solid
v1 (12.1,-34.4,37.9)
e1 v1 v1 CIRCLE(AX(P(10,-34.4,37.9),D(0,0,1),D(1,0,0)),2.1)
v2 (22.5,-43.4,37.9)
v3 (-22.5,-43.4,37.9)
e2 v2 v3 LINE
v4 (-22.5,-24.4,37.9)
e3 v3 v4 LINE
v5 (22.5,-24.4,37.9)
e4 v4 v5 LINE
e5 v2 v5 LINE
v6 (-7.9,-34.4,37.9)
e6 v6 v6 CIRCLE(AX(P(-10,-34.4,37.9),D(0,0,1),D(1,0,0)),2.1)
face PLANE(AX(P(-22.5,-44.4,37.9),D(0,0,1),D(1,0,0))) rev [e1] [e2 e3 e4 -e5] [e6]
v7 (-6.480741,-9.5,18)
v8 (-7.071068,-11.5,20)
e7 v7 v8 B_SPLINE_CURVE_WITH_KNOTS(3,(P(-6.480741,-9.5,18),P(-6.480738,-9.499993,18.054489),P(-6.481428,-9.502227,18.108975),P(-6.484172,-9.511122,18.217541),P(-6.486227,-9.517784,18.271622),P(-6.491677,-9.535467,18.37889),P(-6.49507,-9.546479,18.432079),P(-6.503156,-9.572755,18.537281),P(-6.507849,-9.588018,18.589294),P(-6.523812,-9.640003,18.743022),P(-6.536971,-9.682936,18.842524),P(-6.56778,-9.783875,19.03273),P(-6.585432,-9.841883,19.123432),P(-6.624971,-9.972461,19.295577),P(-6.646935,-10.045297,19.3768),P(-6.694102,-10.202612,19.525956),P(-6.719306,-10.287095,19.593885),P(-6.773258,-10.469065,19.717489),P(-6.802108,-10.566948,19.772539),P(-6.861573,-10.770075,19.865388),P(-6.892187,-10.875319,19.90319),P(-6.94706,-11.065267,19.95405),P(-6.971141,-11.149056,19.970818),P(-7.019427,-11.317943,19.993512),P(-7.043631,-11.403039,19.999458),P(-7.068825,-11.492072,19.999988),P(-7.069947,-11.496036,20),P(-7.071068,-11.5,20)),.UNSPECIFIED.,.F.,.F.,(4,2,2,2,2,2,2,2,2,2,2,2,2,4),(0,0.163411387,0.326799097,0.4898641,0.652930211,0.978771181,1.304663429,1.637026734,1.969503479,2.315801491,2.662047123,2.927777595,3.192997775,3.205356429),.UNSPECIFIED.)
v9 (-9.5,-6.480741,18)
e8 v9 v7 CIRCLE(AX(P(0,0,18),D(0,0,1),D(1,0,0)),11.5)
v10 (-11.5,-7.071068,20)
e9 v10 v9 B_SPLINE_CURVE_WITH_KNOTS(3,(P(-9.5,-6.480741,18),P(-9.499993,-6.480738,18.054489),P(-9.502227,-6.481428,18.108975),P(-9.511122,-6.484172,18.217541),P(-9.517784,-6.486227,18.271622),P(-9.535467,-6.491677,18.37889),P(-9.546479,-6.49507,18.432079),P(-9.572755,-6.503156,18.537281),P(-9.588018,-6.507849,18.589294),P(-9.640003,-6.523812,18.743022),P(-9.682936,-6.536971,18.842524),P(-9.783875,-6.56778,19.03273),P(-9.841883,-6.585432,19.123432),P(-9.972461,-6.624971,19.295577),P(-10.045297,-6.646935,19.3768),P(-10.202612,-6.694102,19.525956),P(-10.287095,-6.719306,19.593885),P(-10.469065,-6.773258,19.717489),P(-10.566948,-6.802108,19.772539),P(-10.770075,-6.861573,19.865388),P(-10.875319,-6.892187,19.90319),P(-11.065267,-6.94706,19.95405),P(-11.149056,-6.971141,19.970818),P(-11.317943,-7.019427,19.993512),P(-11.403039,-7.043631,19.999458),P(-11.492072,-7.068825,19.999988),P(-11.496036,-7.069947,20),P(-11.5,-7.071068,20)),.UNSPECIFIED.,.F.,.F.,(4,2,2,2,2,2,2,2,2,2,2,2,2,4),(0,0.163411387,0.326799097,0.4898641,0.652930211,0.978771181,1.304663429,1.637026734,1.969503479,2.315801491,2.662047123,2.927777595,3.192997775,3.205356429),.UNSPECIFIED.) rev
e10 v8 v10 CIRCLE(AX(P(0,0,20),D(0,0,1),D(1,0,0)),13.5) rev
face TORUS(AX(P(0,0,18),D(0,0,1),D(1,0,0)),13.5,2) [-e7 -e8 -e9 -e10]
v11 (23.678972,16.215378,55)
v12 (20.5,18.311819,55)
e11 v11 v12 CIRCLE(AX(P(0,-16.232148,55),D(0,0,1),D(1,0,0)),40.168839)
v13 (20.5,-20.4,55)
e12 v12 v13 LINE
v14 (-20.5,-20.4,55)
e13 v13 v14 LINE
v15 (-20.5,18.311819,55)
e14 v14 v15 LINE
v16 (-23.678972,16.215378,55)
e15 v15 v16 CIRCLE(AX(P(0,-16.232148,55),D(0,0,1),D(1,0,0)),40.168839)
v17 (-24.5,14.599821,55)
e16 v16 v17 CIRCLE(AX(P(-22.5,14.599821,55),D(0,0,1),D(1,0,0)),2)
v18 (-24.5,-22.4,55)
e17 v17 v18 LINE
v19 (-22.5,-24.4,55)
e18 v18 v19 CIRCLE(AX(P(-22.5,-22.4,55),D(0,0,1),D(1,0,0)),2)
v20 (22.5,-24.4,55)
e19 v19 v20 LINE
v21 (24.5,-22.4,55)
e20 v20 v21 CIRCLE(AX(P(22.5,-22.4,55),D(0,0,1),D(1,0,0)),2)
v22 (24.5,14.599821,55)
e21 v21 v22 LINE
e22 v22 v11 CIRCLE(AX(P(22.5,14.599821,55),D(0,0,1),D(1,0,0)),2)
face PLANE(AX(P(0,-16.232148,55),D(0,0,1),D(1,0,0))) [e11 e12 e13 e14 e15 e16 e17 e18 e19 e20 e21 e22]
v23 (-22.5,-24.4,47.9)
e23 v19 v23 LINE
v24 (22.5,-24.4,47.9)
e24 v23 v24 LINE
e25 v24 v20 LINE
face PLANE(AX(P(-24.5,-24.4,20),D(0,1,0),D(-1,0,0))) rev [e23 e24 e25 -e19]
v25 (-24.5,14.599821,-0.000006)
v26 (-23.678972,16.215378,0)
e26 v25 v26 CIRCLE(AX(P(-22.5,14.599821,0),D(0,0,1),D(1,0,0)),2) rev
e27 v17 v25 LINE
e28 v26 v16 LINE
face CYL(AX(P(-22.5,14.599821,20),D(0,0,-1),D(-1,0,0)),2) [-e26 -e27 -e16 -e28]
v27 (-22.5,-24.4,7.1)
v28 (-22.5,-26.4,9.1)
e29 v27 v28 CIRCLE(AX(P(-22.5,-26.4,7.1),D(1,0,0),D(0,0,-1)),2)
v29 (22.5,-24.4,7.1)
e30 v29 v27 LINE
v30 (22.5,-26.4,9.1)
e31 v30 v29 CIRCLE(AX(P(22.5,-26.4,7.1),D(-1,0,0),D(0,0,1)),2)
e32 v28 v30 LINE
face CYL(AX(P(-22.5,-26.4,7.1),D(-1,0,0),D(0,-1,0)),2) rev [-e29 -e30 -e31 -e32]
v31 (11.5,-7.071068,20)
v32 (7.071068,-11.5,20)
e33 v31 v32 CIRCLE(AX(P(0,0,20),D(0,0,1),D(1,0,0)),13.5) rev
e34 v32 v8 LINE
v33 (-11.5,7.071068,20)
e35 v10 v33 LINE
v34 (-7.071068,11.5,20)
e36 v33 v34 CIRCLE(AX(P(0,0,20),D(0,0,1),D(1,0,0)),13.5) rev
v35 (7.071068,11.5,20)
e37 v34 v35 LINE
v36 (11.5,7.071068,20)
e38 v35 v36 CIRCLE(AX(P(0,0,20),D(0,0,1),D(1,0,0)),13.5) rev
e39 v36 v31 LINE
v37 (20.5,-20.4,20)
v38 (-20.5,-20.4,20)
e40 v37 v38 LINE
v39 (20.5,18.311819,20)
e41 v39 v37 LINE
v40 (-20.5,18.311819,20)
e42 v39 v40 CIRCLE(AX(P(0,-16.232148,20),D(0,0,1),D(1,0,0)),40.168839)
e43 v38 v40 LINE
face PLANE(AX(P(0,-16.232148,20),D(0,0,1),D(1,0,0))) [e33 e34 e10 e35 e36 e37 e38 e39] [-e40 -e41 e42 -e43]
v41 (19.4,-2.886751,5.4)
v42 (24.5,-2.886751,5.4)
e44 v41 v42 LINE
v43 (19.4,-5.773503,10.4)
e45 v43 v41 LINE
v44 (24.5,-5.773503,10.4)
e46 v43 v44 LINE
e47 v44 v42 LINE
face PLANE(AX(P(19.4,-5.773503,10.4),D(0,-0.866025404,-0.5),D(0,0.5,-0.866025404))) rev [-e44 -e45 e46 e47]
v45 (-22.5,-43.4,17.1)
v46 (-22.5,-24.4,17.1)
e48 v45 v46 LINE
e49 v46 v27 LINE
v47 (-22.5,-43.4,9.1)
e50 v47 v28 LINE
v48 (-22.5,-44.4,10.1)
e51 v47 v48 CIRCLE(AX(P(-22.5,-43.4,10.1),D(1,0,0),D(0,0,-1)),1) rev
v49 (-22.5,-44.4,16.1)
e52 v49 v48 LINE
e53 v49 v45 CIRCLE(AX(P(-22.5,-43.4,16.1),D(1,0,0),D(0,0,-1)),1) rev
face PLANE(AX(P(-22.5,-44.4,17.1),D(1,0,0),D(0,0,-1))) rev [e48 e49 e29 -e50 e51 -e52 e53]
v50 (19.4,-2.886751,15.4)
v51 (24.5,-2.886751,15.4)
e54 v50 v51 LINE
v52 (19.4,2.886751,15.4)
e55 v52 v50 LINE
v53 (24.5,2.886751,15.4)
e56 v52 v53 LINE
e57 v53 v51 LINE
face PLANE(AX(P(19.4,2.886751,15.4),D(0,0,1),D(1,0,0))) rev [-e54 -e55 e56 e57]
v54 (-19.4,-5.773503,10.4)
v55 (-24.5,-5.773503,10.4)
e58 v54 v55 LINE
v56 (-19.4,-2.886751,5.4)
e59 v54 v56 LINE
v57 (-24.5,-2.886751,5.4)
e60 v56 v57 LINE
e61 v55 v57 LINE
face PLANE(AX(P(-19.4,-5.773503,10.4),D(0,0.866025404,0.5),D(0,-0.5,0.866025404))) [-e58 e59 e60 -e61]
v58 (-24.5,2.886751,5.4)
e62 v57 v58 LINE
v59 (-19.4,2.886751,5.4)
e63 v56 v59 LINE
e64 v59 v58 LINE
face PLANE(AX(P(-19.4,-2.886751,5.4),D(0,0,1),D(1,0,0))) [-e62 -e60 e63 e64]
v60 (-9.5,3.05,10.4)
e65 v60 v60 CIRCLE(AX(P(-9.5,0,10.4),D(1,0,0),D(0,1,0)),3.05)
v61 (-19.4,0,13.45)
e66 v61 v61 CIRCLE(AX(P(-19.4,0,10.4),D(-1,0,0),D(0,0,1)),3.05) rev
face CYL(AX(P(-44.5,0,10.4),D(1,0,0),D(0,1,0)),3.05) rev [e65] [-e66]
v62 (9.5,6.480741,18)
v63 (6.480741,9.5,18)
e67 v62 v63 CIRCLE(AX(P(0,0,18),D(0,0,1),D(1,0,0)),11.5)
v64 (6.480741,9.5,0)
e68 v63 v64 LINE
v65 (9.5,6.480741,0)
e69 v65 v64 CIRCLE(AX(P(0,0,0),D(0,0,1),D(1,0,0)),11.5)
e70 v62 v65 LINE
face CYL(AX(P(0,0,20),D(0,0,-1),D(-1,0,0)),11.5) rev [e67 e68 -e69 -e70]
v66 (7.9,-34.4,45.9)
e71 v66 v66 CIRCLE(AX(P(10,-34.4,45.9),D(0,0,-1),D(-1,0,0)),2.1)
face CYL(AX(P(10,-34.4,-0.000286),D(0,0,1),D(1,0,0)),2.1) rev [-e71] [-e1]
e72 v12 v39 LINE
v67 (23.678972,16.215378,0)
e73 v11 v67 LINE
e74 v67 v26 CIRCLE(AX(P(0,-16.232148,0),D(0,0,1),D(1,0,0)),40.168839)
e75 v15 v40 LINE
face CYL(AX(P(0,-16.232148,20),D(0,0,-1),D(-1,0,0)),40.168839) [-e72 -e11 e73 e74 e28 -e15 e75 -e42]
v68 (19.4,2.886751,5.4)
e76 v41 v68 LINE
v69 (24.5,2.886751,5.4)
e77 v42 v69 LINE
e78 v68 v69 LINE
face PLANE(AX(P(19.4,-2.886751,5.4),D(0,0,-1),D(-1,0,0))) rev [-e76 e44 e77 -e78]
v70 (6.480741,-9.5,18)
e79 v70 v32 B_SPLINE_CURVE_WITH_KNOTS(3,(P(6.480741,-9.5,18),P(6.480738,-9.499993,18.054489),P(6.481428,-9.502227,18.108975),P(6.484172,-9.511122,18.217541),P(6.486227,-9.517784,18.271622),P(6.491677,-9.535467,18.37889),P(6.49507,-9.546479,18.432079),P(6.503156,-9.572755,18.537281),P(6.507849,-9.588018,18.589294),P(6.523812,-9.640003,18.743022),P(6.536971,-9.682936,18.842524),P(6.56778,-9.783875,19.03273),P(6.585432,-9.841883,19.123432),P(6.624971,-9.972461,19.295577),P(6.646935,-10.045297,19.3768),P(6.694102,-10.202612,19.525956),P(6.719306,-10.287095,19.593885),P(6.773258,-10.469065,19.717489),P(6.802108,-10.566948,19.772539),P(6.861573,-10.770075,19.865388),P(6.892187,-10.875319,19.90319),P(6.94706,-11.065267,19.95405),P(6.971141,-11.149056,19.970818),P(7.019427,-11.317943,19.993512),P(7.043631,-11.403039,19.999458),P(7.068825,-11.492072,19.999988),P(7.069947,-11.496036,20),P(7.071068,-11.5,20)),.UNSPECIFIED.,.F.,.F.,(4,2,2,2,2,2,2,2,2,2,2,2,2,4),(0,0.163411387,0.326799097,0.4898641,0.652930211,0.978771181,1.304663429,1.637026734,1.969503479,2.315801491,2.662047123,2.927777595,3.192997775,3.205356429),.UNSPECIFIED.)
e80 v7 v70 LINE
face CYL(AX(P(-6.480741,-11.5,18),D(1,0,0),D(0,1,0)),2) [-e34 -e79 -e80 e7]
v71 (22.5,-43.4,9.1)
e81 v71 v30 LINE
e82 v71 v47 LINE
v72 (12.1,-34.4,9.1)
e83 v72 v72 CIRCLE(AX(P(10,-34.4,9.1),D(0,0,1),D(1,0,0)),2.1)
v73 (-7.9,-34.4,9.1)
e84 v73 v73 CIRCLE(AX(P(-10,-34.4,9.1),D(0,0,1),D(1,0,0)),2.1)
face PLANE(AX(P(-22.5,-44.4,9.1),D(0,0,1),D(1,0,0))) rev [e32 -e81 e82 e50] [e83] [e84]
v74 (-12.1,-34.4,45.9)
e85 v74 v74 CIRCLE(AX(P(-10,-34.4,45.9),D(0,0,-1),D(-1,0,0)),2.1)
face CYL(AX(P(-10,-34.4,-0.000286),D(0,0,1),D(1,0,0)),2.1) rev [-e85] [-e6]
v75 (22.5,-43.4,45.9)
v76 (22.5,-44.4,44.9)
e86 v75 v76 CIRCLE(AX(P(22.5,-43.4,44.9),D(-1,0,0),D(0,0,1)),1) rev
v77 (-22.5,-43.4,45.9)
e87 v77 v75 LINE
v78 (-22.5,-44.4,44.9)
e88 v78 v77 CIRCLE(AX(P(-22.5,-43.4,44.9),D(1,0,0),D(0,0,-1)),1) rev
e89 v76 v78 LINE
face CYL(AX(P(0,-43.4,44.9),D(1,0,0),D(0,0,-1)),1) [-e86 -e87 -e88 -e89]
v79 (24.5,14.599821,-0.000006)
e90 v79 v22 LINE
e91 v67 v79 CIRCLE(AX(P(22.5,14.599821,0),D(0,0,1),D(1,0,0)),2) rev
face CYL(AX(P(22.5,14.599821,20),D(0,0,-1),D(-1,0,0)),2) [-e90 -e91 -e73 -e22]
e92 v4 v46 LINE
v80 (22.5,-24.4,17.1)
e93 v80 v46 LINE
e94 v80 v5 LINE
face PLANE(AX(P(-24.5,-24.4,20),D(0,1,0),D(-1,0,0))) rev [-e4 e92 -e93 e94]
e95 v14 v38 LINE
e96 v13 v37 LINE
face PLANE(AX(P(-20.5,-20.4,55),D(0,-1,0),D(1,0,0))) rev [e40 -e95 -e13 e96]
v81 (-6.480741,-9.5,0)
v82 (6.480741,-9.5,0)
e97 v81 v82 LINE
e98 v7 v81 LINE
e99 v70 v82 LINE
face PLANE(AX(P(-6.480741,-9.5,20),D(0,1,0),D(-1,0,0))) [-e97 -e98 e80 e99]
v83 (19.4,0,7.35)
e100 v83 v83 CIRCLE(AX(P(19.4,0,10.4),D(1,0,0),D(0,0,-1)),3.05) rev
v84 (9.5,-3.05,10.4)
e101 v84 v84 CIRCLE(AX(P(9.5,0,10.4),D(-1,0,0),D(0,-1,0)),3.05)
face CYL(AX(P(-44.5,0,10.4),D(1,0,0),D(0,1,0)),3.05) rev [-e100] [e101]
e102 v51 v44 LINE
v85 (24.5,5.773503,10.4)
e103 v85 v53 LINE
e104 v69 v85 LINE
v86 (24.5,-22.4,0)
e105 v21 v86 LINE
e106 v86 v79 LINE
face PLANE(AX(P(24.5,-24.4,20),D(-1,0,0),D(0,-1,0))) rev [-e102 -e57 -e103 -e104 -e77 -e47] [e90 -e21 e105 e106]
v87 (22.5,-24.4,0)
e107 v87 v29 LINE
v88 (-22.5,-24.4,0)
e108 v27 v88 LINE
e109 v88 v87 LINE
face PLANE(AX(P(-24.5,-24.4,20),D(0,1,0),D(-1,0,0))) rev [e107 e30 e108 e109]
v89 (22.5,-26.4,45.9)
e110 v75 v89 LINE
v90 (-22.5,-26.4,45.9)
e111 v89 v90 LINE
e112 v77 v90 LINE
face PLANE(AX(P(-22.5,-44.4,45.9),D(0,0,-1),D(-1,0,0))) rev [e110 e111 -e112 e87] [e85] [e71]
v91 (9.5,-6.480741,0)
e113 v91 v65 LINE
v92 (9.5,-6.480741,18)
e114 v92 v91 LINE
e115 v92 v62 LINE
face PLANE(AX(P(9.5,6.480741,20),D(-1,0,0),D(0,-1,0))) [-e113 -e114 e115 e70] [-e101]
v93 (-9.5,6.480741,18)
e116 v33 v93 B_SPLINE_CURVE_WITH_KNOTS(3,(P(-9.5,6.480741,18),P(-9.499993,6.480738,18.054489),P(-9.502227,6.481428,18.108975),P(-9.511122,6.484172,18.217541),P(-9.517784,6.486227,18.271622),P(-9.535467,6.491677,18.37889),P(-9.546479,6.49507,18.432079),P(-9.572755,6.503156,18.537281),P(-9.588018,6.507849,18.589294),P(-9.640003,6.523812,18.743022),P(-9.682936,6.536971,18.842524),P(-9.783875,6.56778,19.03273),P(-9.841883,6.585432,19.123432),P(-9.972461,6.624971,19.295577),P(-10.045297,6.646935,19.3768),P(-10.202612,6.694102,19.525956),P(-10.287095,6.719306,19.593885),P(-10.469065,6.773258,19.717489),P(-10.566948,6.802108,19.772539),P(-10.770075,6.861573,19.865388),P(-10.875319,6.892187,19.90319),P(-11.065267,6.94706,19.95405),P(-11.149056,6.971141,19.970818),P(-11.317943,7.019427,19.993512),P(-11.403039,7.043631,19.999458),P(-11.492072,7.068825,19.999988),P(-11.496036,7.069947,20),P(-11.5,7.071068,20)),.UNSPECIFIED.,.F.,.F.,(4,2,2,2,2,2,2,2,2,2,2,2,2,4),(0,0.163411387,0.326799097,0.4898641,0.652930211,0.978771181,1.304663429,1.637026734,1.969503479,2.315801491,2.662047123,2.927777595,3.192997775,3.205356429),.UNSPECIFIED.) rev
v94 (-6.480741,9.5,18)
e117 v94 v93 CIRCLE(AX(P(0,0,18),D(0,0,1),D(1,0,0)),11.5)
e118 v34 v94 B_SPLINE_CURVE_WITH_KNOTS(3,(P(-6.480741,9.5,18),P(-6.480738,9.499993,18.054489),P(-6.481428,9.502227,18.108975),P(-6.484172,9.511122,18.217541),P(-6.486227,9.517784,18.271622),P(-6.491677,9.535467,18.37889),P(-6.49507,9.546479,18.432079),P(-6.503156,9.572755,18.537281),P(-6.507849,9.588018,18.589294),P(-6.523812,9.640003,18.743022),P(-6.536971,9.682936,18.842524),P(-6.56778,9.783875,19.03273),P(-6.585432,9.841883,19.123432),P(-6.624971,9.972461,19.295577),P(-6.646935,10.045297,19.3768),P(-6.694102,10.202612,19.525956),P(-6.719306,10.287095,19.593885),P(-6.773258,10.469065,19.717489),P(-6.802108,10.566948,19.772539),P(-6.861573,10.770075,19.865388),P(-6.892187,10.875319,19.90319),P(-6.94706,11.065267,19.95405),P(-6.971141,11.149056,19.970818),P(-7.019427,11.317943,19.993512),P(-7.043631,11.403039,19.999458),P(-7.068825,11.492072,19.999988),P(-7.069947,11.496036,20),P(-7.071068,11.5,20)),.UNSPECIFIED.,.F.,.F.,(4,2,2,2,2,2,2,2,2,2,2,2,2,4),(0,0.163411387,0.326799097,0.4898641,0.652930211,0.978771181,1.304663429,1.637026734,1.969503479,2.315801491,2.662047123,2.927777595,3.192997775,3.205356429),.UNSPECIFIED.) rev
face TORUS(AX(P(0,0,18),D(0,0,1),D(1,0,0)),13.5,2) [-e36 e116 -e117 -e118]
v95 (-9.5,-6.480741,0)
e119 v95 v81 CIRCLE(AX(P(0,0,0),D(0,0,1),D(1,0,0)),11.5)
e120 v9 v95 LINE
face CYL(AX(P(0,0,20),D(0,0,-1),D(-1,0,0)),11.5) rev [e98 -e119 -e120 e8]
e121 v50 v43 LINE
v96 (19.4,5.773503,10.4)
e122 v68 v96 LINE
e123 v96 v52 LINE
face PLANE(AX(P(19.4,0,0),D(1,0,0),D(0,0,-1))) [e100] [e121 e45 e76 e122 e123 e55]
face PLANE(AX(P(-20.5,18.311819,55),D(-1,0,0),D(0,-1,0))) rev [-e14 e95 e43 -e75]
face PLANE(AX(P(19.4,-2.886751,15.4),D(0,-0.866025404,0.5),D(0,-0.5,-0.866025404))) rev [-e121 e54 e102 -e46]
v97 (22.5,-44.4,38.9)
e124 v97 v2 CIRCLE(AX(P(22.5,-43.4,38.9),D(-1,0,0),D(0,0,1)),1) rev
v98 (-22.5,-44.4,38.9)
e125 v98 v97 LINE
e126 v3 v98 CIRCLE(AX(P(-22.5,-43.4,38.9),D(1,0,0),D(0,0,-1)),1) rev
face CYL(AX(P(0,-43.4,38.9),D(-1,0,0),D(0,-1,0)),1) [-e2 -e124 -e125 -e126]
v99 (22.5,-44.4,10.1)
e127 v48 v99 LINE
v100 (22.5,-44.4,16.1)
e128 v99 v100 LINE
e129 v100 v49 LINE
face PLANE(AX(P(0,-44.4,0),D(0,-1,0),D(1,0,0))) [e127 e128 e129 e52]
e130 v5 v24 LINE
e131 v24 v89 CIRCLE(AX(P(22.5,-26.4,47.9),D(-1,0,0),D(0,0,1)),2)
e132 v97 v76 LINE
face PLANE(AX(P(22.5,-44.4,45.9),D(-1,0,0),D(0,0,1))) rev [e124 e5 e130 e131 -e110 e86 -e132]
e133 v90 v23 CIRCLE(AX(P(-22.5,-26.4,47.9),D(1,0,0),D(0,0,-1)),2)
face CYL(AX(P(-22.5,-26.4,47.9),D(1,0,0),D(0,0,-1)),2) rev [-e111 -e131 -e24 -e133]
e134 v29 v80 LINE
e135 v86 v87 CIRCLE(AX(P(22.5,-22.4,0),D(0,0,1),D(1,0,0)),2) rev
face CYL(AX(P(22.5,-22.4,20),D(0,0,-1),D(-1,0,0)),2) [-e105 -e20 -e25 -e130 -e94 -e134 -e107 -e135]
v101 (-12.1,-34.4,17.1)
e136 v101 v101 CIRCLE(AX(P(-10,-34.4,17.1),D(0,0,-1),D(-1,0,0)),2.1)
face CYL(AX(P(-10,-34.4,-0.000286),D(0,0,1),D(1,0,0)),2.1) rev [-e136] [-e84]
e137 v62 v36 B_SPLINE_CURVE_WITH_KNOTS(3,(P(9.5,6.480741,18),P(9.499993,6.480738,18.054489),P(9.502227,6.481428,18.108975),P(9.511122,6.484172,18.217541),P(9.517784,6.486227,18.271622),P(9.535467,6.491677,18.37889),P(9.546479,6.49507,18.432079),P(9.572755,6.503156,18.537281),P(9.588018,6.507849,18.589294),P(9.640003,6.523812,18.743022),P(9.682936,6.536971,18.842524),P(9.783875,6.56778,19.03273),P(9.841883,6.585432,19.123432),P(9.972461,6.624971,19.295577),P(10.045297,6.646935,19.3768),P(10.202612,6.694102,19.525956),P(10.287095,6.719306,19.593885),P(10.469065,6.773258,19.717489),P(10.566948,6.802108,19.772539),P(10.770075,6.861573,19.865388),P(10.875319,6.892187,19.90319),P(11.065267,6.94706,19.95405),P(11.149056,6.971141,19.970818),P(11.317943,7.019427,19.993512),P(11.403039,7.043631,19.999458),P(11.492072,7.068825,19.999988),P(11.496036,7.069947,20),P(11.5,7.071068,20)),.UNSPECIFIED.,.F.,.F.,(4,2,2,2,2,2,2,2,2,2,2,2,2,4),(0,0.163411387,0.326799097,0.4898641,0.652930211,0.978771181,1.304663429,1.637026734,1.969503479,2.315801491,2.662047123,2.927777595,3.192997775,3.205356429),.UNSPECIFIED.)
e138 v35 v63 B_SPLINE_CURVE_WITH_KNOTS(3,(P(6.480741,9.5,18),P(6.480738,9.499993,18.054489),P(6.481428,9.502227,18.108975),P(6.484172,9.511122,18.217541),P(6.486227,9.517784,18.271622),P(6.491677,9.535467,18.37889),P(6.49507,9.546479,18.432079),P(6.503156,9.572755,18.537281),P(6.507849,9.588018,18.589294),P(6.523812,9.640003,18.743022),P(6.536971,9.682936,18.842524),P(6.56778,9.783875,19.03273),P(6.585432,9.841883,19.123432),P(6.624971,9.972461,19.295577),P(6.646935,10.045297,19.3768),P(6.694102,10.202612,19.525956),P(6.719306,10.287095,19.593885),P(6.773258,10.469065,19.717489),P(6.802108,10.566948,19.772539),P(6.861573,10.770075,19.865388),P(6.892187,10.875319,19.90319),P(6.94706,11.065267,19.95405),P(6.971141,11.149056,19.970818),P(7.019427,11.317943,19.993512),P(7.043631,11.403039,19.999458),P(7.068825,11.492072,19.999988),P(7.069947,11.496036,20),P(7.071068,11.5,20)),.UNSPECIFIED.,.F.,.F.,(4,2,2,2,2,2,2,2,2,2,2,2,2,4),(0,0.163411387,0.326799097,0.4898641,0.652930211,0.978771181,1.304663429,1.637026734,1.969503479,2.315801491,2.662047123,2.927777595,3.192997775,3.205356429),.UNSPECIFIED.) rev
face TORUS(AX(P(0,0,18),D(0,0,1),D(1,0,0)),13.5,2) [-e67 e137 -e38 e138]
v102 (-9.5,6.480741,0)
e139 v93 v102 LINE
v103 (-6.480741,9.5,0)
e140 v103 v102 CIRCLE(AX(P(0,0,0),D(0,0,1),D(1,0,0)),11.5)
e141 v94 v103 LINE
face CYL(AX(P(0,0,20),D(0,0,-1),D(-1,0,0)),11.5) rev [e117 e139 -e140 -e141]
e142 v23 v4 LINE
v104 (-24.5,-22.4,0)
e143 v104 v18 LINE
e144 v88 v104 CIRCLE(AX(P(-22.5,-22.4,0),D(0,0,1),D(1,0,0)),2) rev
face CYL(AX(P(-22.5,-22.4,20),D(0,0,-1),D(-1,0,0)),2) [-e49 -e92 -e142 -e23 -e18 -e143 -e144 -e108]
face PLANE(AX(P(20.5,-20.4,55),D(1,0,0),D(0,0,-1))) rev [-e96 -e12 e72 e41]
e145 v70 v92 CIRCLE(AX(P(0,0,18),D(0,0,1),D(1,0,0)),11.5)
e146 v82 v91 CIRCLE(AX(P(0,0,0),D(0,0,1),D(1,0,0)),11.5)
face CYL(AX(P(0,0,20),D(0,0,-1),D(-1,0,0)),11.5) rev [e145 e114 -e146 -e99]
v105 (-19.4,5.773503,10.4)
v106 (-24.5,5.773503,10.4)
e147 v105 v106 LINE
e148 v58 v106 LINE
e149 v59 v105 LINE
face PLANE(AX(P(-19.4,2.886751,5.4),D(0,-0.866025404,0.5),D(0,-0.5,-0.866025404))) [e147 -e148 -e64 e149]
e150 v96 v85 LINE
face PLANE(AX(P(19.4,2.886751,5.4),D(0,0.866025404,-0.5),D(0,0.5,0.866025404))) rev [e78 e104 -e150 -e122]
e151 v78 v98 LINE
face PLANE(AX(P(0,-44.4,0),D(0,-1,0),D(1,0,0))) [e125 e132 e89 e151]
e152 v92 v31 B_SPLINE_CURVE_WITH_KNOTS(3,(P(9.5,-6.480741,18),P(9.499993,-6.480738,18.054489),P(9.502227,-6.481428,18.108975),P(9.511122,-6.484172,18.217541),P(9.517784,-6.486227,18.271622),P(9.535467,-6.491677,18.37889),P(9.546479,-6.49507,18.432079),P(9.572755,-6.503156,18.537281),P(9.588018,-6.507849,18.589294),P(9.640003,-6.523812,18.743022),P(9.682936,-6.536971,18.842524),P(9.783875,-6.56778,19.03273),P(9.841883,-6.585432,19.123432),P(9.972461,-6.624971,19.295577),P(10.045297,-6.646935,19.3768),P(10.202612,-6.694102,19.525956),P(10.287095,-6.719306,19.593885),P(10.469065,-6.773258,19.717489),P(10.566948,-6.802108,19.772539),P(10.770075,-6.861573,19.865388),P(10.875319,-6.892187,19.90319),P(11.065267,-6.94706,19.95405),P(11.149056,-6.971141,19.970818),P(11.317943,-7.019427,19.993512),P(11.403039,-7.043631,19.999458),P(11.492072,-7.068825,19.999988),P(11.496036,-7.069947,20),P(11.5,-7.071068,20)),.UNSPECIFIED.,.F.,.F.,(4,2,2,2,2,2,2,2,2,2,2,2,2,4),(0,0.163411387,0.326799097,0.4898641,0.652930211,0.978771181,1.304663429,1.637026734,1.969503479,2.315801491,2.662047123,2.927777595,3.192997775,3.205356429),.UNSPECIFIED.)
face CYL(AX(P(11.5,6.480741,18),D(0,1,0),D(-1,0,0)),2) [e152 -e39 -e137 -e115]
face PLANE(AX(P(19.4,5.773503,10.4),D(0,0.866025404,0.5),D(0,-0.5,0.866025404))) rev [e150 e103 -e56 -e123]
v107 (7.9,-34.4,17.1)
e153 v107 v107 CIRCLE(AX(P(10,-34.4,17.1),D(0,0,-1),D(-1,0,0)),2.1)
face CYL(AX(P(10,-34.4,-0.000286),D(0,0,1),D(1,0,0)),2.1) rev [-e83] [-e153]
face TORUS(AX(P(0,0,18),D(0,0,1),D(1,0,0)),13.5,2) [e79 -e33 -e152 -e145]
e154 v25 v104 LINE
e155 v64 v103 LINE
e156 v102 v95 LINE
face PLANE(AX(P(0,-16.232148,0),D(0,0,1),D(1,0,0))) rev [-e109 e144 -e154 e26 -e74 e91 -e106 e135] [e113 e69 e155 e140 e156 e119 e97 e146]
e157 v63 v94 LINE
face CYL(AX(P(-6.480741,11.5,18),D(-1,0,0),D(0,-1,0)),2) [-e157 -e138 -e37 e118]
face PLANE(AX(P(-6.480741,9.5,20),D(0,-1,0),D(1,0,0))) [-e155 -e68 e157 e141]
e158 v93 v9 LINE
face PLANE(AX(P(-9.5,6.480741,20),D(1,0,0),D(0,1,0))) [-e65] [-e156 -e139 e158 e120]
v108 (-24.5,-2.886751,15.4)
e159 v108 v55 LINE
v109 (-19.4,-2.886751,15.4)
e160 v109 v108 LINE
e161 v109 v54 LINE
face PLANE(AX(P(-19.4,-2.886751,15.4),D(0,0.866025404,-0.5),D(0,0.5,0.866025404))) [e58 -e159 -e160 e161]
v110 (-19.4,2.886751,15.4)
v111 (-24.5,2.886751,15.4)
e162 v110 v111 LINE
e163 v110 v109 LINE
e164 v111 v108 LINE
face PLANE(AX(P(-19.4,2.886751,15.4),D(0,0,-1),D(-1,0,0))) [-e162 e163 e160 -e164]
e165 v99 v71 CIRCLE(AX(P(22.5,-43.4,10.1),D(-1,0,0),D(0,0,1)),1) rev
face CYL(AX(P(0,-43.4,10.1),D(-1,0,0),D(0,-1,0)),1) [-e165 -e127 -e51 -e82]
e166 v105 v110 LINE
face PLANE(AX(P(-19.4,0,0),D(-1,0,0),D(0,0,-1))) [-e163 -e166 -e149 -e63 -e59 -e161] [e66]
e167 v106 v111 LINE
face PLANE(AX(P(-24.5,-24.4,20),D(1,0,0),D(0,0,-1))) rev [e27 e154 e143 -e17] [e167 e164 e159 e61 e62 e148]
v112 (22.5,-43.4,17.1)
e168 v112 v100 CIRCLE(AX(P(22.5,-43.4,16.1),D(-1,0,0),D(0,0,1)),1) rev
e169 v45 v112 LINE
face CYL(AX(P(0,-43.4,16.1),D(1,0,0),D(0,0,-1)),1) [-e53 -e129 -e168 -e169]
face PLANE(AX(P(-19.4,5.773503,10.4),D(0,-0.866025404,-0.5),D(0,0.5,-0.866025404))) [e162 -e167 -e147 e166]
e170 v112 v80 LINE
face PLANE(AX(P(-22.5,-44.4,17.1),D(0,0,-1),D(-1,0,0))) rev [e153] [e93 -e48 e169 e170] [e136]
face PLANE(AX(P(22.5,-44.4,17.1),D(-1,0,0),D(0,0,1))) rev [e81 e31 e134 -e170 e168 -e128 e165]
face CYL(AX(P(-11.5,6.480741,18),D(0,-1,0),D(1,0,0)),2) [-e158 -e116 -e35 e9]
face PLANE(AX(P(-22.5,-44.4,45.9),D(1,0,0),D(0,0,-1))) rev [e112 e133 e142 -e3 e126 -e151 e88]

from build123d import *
from build123d.topology import SkipClean

# Parameters (mm, degrees)
EXTRUDE_1_DEPTH          = 20
EXTRUDE_2_DEPTH          = 35
FILLET_1_R               = 2
FILLET_2_R               = 2
SKETCH_3_W               = 55
SKETCH_3_H               = 8
EXTRUDE_3_DEPTH          = 20
CUT_EXTRUDE_1_DEPTH      = 81.785122448
FILLET_3_R               = 2
CUT_EXTRUDE_2_DEPTH      = 92.549767886
CUT_EXTRUDE_2_DEPTH_BACK = 92.549767886
SKETCH_6_R               = 3.05
CUT_EXTRUDE_3_DEPTH      = 5.1
FILLET_3_OF_MIRROR_1_R   = 2
CUT_EXTRUDE_4_DEPTH      = 75.837223358
CUT_EXTRUDE_4_DEPTH_BACK = 75.837223358
SKETCH_9_R               = 1.6
SKETCH_10_R              = 3
CUT_EXTRUDE_5_DEPTH      = 3
CUT_EXTRUDE_START        = -2
SKETCH_11_R              = 3
CUT_EXTRUDE_6_DEPTH      = 2
CUT_EXTRUDE_7_DEPTH      = 75.837223358
CUT_EXTRUDE_7_DEPTH_BACK = 75.837223358
SKETCH_12_W              = 29.59816484
SKETCH_12_H              = 37.248372047
SKETCH_12_W_2            = 30.6542071
SKETCH_12_H_2            = 41.472541085
SKETCH_13_W              = 45
SKETCH_13_H              = 8
EXTRUDE_4_DEPTH          = 20
CUT_EXTRUDE_8_DEPTH      = 69.398976601
CUT_EXTRUDE_8_DEPTH_BACK = 69.398976601
SKETCH_14_R              = 2.1
FILLET_5_R               = 1
FILLET_6_R               = 2


with BuildPart() as part:
    # 草图1 → 凸台-拉伸1 (new body)
    with BuildSketch(Plane.XY):
        with BuildLine():
            Line((-24.5, -24.4), (24.5, -24.4))
            Line((24.5, -24.4), (24.5, 15.6))
            ThreePointArc((24.5, 15.6), (0, 23.936691271), (-24.5, 15.6))
            Line((-24.5, 15.6), (-24.5, -24.4))
        make_face()
        with BuildLine():
            Line((-6.480740698, 9.5), (6.480740698, 9.5))
            ThreePointArc((6.480740698, 9.5), (8.131727984, 8.131727984), (9.5, 6.480740698))
            Line((9.5, 6.480740698), (9.5, -6.480740698))
            ThreePointArc((9.5, -6.480740698), (8.131727984, -8.131727984), (6.480740698, -9.5))
            Line((6.480740698, -9.5), (-6.480740698, -9.5))
            ThreePointArc((-6.480740698, -9.5), (-8.131727984, -8.131727984), (-9.5, -6.480740698))
            Line((-9.5, -6.480740698), (-9.5, 6.480740698))
            ThreePointArc((-9.5, 6.480740698), (-8.131727984, 8.131727984), (-6.480740698, 9.5))
        make_face(mode=Mode.SUBTRACT)
    extrude(amount=EXTRUDE_1_DEPTH)

    # 草图2 → 凸台-拉伸2 (add)
    with SkipClean():  # the faces are left unmerged after this step: merging them gives an invalid solid
        with BuildSketch(Plane.XY.offset(20)):
            with BuildLine():
                Line((-20.5, 18.311818868), (-20.5, -20.4))
                Line((-20.5, -20.4), (20.5, -20.4))
                Line((20.5, -20.4), (20.5, 18.311818868))
                ThreePointArc((20.5, 18.311818868), (22.540818317, 17.016117462), (24.5, 15.6))
                Line((24.5, 15.6), (24.5, -24.4))
                Line((24.5, -24.4), (-24.5, -24.4))
                Line((-24.5, -24.4), (-24.5, 15.6))
                ThreePointArc((-24.5, 15.6), (-22.540818317, 17.016117462), (-20.5, 18.311818868))
            make_face()
        extrude(amount=EXTRUDE_2_DEPTH)

    # 圆角1
    fillet_1_edges = [part.edges().sort_by_distance(p)[0] for p in [
        (-24.5, 15.6, 37.5),
        (24.5, 15.6, 37.5),
        (24.5, -24.4, 37.5),
        (-24.5, -24.4, 37.5),
    ]]
    fillet(fillet_1_edges, radius=FILLET_1_R)

    # 圆角2
    fillet_2_edges = [part.edges().sort_by_distance(p)[0] for p in [
        (8.131727984, 8.131727984, 20),
        (0, 9.5, 20),
        (-8.131727984, 8.131727984, 20),
        (-9.5, 0, 20),
        (-8.131727984, -8.131727984, 20),
        (0, -9.5, 20),
        (8.131727984, -8.131727984, 20),
        (9.5, 0, 20),
    ]]
    fillet(fillet_2_edges, radius=FILLET_2_R)

    # 草图3 → 凸台-拉伸3 (add)
    with SkipClean():  # the faces are left unmerged after this step: merging them gives an invalid solid
        with BuildSketch(Plane.ZY.offset(24.5)):
            with Locations((27.5, 10.599820628)):
                Rectangle(SKETCH_3_W, SKETCH_3_H)
            with Locations((27.5, -18.000179372)):
                Rectangle(SKETCH_3_W, SKETCH_3_H)
        extrude_3 = extrude(amount=EXTRUDE_3_DEPTH)

    # 草图4 → 切除-拉伸1 (cut, symmetric)
    with SkipClean():  # the faces are left unmerged after this step: merging them gives an invalid solid
        with BuildSketch(Plane(origin=(0, 14.599820628, 0), x_dir=(1, 0, 0), z_dir=(0, 1, 0))):
            with BuildLine():
                Line((-39.25, -11.75), (-29.75, -11.75))
                ThreePointArc((-29.75, -11.75), (-29.042893219, -12.042893219), (-28.75, -12.75))
                Line((-28.75, -12.75), (-28.75, -17.25))
                ThreePointArc((-28.75, -17.25), (-29.042893219, -17.957106781), (-29.75, -18.25))
                Line((-29.75, -18.25), (-39.25, -18.25))
                ThreePointArc((-39.25, -18.25), (-39.957106781, -17.957106781), (-40.25, -17.25))
                Line((-40.25, -17.25), (-40.25, -12.75))
                ThreePointArc((-40.25, -12.75), (-39.957106781, -12.042893219), (-39.25, -11.75))
            make_face()
            with BuildLine():
                Line((-39.25, -36.75), (-29.75, -36.75))
                ThreePointArc((-29.75, -36.75), (-29.042893219, -37.042893219), (-28.75, -37.75))
                Line((-28.75, -37.75), (-28.75, -42.25))
                ThreePointArc((-28.75, -42.25), (-29.042893219, -42.957106781), (-29.75, -43.25))
                Line((-29.75, -43.25), (-39.25, -43.25))
                ThreePointArc((-39.25, -43.25), (-39.957106781, -42.957106781), (-40.25, -42.25))
                Line((-40.25, -42.25), (-40.25, -37.75))
                ThreePointArc((-40.25, -37.75), (-39.957106781, -37.042893219), (-39.25, -36.75))
            make_face()
        cut_extrude_1 = extrude(amount=CUT_EXTRUDE_1_DEPTH, both=True, mode=Mode.SUBTRACT)

    # 圆角3
    fillet_3_edges = [part.edges().sort_by_distance(p)[0] for p in [
        (-44.5, 6.599820628, 27.5),
        (-44.5, 14.599820628, 27.5),
        (-44.5, -14.000179372, 27.5),
        (-44.5, -22.000179372, 27.5),
    ]]
    fillet(fillet_3_edges, radius=FILLET_3_R)

    # 草图6 → 切除-拉伸2 (cut, two sides: drawn at the far end of the back side and taken through both)
    with BuildSketch(Plane(origin=(24.5, 0, 0), x_dir=(0, 0, -1), z_dir=(1, 0, 0)).offset(-CUT_EXTRUDE_2_DEPTH_BACK)):
        with Locations(Location((-10.4, 0, 0), (0, 0, 270))):
            Circle(SKETCH_6_R)
    extrude(amount=CUT_EXTRUDE_2_DEPTH + CUT_EXTRUDE_2_DEPTH_BACK, mode=Mode.SUBTRACT)

    # 草图7 → 切除-拉伸3 (cut)
    with BuildSketch(Plane(origin=(24.5, 0, 0), x_dir=(0, 0, -1), z_dir=(1, 0, 0))):
        Polygon((-5.4, -2.886751346), (-5.4, 2.886751346), (-10.4, 5.773502692), (-15.4, 2.886751346), (-15.4, -2.886751346), (-10.4, -5.773502692), align=None)
    cut_extrude_3 = extrude(amount=-CUT_EXTRUDE_3_DEPTH, mode=Mode.SUBTRACT)

    # 镜向1: 凸台-拉伸3, 切除-拉伸1, 切除-拉伸3 across plane
    add(extrude_3.mirror(Plane(origin=(0, 0, 0), x_dir=(0, 0, 1), z_dir=(1, 0, 0))))
    add(cut_extrude_1.mirror(Plane(origin=(0, 0, 0), x_dir=(0, 0, 1), z_dir=(1, 0, 0))), mode=Mode.SUBTRACT)
    add(cut_extrude_3.mirror(Plane(origin=(0, 0, 0), x_dir=(0, 0, 1), z_dir=(1, 0, 0))), mode=Mode.SUBTRACT)

    # 圆角3 of 镜向1
    fillet_3_of_mirror_1_edges = [part.edges().sort_by_distance(p)[0] for p in [
        (44.5, 6.599820628, 27.5),
        (44.5, 14.599820628, 27.5),
        (44.5, -14.000179372, 27.5),
        (44.5, -22.000179372, 27.5),
    ]]
    fillet(fillet_3_of_mirror_1_edges, radius=FILLET_3_OF_MIRROR_1_R)

    # 草图9 → 切除-拉伸4 (cut, two sides: drawn at the far end of the back side and taken through both)
    with BuildSketch(Plane(origin=(0, 0, 0), x_dir=(-1, 0, 0), z_dir=(0, 0, -1)).offset(-CUT_EXTRUDE_4_DEPTH_BACK)):
        with Locations((34.5, -18.000179372)):
            Circle(SKETCH_9_R)
        with Locations((34.5, 10.599820628)):
            Circle(SKETCH_9_R)
        with Locations((-34.5, 10.599820628)):
            Circle(SKETCH_9_R)
        with Locations((-34.5, -18.000179372)):
            Circle(SKETCH_9_R)
    extrude(amount=CUT_EXTRUDE_4_DEPTH + CUT_EXTRUDE_4_DEPTH_BACK, mode=Mode.SUBTRACT)

    # 草图10 → 切除-拉伸5 (cut)
    with BuildSketch(Plane(origin=(0, 0, 0), x_dir=(-1, 0, 0), z_dir=(0, 0, -1))):
        with Locations((34.5, 10.599820628)):
            Circle(SKETCH_10_R)
        with Locations((34.5, -18.000179372)):
            Circle(SKETCH_10_R)
        with Locations((-34.5, -18.000179372)):
            Circle(SKETCH_10_R)
        with Locations((-34.5, 10.599820628)):
            Circle(SKETCH_10_R)
    extrude(amount=-CUT_EXTRUDE_5_DEPTH, mode=Mode.SUBTRACT)

    # 草图11 → 切除-拉伸6 (cut)
    with BuildSketch(Plane.XY.offset(55).offset(CUT_EXTRUDE_START)):
        with Locations(Location((34.5, 10.599820628, 0), (0, 0, 180))):
            Circle(SKETCH_11_R)
        with Locations(Location((34.5, -18.000179372, 0), (0, 0, 180))):
            Circle(SKETCH_11_R)
        with Locations(Location((-34.5, -18.000179372, 0), (0, 0, 180))):
            Circle(SKETCH_11_R)
        with Locations(Location((-34.5, 10.599820628, 0), (0, 0, 180))):
            Circle(SKETCH_11_R)
    extrude(amount=CUT_EXTRUDE_6_DEPTH, mode=Mode.SUBTRACT)

    # 草图12 → 切除-拉伸7 (cut, two sides: drawn at the far end of the back side and taken through both)
    with BuildSketch(Plane(origin=(0, 0, 0), x_dir=(-1, 0, 0), z_dir=(0, 0, -1)).offset(-CUT_EXTRUDE_7_DEPTH_BACK)):
        with Locations((-39.29908242, -4.024365395)):
            Rectangle(SKETCH_12_W, SKETCH_12_H)
        with Locations((39.82710355, -6.136449915)):
            Rectangle(SKETCH_12_W_2, SKETCH_12_H_2)
    extrude(amount=CUT_EXTRUDE_7_DEPTH + CUT_EXTRUDE_7_DEPTH_BACK, mode=Mode.SUBTRACT)

    # 草图13 → 凸台-拉伸4 (add)
    with BuildSketch(Plane.XZ.offset(24.4)):
        with Locations((0, 41.9)):
            Rectangle(SKETCH_13_W, SKETCH_13_H)
        with Locations((0, 13.1)):
            Rectangle(SKETCH_13_W, SKETCH_13_H)
    extrude(amount=EXTRUDE_4_DEPTH)

    # 草图14 → 切除-拉伸8 (cut, two sides: drawn at the far end of the back side and taken through both)
    with BuildSketch(Plane.XY.offset(45.9).offset(-CUT_EXTRUDE_8_DEPTH_BACK)):
        with Locations((-10, -34.4)):
            Circle(SKETCH_14_R)
        with Locations((10, -34.4)):
            Circle(SKETCH_14_R)
    extrude(amount=CUT_EXTRUDE_8_DEPTH + CUT_EXTRUDE_8_DEPTH_BACK, mode=Mode.SUBTRACT)

    # 圆角5
    fillet_5_edges = [part.edges().sort_by_distance(p)[0] for p in [
        (0, -44.4, 37.9),
        (0, -44.4, 45.9),
        (0, -44.4, 9.1),
        (0, -44.4, 17.1),
    ]]
    fillet(fillet_5_edges, radius=FILLET_5_R)

    # 圆角6
    # the kernel refuses this fillet: 2 mm, written as the material it adds along each edge
    with BuildSketch(Plane(origin=(-22.5, -24.4, 45.9), x_dir=(0, -1, 0), z_dir=(1, 0, 0))) as fillet_6_piece_1:
        with BuildLine():
            CenterArc((FILLET_6_R, -FILLET_6_R), FILLET_6_R, 90, 90)
            Line((0, -FILLET_6_R), (0, 0))
            Line((0, 0), (FILLET_6_R, 0))
        make_face()
    extrude(amount=45)
    with BuildSketch(Plane(origin=(22.5, -24.4, 9.1), x_dir=(0, 0, -1), z_dir=(-1, 0, 0))) as fillet_6_piece_2:
        with BuildLine():
            CenterArc((FILLET_6_R, FILLET_6_R), FILLET_6_R, 180, 90)
            Line((0, FILLET_6_R), (0, 0))
            Line((0, 0), (FILLET_6_R, 0))
        make_face()
    extrude(amount=45)


solid = part.part
